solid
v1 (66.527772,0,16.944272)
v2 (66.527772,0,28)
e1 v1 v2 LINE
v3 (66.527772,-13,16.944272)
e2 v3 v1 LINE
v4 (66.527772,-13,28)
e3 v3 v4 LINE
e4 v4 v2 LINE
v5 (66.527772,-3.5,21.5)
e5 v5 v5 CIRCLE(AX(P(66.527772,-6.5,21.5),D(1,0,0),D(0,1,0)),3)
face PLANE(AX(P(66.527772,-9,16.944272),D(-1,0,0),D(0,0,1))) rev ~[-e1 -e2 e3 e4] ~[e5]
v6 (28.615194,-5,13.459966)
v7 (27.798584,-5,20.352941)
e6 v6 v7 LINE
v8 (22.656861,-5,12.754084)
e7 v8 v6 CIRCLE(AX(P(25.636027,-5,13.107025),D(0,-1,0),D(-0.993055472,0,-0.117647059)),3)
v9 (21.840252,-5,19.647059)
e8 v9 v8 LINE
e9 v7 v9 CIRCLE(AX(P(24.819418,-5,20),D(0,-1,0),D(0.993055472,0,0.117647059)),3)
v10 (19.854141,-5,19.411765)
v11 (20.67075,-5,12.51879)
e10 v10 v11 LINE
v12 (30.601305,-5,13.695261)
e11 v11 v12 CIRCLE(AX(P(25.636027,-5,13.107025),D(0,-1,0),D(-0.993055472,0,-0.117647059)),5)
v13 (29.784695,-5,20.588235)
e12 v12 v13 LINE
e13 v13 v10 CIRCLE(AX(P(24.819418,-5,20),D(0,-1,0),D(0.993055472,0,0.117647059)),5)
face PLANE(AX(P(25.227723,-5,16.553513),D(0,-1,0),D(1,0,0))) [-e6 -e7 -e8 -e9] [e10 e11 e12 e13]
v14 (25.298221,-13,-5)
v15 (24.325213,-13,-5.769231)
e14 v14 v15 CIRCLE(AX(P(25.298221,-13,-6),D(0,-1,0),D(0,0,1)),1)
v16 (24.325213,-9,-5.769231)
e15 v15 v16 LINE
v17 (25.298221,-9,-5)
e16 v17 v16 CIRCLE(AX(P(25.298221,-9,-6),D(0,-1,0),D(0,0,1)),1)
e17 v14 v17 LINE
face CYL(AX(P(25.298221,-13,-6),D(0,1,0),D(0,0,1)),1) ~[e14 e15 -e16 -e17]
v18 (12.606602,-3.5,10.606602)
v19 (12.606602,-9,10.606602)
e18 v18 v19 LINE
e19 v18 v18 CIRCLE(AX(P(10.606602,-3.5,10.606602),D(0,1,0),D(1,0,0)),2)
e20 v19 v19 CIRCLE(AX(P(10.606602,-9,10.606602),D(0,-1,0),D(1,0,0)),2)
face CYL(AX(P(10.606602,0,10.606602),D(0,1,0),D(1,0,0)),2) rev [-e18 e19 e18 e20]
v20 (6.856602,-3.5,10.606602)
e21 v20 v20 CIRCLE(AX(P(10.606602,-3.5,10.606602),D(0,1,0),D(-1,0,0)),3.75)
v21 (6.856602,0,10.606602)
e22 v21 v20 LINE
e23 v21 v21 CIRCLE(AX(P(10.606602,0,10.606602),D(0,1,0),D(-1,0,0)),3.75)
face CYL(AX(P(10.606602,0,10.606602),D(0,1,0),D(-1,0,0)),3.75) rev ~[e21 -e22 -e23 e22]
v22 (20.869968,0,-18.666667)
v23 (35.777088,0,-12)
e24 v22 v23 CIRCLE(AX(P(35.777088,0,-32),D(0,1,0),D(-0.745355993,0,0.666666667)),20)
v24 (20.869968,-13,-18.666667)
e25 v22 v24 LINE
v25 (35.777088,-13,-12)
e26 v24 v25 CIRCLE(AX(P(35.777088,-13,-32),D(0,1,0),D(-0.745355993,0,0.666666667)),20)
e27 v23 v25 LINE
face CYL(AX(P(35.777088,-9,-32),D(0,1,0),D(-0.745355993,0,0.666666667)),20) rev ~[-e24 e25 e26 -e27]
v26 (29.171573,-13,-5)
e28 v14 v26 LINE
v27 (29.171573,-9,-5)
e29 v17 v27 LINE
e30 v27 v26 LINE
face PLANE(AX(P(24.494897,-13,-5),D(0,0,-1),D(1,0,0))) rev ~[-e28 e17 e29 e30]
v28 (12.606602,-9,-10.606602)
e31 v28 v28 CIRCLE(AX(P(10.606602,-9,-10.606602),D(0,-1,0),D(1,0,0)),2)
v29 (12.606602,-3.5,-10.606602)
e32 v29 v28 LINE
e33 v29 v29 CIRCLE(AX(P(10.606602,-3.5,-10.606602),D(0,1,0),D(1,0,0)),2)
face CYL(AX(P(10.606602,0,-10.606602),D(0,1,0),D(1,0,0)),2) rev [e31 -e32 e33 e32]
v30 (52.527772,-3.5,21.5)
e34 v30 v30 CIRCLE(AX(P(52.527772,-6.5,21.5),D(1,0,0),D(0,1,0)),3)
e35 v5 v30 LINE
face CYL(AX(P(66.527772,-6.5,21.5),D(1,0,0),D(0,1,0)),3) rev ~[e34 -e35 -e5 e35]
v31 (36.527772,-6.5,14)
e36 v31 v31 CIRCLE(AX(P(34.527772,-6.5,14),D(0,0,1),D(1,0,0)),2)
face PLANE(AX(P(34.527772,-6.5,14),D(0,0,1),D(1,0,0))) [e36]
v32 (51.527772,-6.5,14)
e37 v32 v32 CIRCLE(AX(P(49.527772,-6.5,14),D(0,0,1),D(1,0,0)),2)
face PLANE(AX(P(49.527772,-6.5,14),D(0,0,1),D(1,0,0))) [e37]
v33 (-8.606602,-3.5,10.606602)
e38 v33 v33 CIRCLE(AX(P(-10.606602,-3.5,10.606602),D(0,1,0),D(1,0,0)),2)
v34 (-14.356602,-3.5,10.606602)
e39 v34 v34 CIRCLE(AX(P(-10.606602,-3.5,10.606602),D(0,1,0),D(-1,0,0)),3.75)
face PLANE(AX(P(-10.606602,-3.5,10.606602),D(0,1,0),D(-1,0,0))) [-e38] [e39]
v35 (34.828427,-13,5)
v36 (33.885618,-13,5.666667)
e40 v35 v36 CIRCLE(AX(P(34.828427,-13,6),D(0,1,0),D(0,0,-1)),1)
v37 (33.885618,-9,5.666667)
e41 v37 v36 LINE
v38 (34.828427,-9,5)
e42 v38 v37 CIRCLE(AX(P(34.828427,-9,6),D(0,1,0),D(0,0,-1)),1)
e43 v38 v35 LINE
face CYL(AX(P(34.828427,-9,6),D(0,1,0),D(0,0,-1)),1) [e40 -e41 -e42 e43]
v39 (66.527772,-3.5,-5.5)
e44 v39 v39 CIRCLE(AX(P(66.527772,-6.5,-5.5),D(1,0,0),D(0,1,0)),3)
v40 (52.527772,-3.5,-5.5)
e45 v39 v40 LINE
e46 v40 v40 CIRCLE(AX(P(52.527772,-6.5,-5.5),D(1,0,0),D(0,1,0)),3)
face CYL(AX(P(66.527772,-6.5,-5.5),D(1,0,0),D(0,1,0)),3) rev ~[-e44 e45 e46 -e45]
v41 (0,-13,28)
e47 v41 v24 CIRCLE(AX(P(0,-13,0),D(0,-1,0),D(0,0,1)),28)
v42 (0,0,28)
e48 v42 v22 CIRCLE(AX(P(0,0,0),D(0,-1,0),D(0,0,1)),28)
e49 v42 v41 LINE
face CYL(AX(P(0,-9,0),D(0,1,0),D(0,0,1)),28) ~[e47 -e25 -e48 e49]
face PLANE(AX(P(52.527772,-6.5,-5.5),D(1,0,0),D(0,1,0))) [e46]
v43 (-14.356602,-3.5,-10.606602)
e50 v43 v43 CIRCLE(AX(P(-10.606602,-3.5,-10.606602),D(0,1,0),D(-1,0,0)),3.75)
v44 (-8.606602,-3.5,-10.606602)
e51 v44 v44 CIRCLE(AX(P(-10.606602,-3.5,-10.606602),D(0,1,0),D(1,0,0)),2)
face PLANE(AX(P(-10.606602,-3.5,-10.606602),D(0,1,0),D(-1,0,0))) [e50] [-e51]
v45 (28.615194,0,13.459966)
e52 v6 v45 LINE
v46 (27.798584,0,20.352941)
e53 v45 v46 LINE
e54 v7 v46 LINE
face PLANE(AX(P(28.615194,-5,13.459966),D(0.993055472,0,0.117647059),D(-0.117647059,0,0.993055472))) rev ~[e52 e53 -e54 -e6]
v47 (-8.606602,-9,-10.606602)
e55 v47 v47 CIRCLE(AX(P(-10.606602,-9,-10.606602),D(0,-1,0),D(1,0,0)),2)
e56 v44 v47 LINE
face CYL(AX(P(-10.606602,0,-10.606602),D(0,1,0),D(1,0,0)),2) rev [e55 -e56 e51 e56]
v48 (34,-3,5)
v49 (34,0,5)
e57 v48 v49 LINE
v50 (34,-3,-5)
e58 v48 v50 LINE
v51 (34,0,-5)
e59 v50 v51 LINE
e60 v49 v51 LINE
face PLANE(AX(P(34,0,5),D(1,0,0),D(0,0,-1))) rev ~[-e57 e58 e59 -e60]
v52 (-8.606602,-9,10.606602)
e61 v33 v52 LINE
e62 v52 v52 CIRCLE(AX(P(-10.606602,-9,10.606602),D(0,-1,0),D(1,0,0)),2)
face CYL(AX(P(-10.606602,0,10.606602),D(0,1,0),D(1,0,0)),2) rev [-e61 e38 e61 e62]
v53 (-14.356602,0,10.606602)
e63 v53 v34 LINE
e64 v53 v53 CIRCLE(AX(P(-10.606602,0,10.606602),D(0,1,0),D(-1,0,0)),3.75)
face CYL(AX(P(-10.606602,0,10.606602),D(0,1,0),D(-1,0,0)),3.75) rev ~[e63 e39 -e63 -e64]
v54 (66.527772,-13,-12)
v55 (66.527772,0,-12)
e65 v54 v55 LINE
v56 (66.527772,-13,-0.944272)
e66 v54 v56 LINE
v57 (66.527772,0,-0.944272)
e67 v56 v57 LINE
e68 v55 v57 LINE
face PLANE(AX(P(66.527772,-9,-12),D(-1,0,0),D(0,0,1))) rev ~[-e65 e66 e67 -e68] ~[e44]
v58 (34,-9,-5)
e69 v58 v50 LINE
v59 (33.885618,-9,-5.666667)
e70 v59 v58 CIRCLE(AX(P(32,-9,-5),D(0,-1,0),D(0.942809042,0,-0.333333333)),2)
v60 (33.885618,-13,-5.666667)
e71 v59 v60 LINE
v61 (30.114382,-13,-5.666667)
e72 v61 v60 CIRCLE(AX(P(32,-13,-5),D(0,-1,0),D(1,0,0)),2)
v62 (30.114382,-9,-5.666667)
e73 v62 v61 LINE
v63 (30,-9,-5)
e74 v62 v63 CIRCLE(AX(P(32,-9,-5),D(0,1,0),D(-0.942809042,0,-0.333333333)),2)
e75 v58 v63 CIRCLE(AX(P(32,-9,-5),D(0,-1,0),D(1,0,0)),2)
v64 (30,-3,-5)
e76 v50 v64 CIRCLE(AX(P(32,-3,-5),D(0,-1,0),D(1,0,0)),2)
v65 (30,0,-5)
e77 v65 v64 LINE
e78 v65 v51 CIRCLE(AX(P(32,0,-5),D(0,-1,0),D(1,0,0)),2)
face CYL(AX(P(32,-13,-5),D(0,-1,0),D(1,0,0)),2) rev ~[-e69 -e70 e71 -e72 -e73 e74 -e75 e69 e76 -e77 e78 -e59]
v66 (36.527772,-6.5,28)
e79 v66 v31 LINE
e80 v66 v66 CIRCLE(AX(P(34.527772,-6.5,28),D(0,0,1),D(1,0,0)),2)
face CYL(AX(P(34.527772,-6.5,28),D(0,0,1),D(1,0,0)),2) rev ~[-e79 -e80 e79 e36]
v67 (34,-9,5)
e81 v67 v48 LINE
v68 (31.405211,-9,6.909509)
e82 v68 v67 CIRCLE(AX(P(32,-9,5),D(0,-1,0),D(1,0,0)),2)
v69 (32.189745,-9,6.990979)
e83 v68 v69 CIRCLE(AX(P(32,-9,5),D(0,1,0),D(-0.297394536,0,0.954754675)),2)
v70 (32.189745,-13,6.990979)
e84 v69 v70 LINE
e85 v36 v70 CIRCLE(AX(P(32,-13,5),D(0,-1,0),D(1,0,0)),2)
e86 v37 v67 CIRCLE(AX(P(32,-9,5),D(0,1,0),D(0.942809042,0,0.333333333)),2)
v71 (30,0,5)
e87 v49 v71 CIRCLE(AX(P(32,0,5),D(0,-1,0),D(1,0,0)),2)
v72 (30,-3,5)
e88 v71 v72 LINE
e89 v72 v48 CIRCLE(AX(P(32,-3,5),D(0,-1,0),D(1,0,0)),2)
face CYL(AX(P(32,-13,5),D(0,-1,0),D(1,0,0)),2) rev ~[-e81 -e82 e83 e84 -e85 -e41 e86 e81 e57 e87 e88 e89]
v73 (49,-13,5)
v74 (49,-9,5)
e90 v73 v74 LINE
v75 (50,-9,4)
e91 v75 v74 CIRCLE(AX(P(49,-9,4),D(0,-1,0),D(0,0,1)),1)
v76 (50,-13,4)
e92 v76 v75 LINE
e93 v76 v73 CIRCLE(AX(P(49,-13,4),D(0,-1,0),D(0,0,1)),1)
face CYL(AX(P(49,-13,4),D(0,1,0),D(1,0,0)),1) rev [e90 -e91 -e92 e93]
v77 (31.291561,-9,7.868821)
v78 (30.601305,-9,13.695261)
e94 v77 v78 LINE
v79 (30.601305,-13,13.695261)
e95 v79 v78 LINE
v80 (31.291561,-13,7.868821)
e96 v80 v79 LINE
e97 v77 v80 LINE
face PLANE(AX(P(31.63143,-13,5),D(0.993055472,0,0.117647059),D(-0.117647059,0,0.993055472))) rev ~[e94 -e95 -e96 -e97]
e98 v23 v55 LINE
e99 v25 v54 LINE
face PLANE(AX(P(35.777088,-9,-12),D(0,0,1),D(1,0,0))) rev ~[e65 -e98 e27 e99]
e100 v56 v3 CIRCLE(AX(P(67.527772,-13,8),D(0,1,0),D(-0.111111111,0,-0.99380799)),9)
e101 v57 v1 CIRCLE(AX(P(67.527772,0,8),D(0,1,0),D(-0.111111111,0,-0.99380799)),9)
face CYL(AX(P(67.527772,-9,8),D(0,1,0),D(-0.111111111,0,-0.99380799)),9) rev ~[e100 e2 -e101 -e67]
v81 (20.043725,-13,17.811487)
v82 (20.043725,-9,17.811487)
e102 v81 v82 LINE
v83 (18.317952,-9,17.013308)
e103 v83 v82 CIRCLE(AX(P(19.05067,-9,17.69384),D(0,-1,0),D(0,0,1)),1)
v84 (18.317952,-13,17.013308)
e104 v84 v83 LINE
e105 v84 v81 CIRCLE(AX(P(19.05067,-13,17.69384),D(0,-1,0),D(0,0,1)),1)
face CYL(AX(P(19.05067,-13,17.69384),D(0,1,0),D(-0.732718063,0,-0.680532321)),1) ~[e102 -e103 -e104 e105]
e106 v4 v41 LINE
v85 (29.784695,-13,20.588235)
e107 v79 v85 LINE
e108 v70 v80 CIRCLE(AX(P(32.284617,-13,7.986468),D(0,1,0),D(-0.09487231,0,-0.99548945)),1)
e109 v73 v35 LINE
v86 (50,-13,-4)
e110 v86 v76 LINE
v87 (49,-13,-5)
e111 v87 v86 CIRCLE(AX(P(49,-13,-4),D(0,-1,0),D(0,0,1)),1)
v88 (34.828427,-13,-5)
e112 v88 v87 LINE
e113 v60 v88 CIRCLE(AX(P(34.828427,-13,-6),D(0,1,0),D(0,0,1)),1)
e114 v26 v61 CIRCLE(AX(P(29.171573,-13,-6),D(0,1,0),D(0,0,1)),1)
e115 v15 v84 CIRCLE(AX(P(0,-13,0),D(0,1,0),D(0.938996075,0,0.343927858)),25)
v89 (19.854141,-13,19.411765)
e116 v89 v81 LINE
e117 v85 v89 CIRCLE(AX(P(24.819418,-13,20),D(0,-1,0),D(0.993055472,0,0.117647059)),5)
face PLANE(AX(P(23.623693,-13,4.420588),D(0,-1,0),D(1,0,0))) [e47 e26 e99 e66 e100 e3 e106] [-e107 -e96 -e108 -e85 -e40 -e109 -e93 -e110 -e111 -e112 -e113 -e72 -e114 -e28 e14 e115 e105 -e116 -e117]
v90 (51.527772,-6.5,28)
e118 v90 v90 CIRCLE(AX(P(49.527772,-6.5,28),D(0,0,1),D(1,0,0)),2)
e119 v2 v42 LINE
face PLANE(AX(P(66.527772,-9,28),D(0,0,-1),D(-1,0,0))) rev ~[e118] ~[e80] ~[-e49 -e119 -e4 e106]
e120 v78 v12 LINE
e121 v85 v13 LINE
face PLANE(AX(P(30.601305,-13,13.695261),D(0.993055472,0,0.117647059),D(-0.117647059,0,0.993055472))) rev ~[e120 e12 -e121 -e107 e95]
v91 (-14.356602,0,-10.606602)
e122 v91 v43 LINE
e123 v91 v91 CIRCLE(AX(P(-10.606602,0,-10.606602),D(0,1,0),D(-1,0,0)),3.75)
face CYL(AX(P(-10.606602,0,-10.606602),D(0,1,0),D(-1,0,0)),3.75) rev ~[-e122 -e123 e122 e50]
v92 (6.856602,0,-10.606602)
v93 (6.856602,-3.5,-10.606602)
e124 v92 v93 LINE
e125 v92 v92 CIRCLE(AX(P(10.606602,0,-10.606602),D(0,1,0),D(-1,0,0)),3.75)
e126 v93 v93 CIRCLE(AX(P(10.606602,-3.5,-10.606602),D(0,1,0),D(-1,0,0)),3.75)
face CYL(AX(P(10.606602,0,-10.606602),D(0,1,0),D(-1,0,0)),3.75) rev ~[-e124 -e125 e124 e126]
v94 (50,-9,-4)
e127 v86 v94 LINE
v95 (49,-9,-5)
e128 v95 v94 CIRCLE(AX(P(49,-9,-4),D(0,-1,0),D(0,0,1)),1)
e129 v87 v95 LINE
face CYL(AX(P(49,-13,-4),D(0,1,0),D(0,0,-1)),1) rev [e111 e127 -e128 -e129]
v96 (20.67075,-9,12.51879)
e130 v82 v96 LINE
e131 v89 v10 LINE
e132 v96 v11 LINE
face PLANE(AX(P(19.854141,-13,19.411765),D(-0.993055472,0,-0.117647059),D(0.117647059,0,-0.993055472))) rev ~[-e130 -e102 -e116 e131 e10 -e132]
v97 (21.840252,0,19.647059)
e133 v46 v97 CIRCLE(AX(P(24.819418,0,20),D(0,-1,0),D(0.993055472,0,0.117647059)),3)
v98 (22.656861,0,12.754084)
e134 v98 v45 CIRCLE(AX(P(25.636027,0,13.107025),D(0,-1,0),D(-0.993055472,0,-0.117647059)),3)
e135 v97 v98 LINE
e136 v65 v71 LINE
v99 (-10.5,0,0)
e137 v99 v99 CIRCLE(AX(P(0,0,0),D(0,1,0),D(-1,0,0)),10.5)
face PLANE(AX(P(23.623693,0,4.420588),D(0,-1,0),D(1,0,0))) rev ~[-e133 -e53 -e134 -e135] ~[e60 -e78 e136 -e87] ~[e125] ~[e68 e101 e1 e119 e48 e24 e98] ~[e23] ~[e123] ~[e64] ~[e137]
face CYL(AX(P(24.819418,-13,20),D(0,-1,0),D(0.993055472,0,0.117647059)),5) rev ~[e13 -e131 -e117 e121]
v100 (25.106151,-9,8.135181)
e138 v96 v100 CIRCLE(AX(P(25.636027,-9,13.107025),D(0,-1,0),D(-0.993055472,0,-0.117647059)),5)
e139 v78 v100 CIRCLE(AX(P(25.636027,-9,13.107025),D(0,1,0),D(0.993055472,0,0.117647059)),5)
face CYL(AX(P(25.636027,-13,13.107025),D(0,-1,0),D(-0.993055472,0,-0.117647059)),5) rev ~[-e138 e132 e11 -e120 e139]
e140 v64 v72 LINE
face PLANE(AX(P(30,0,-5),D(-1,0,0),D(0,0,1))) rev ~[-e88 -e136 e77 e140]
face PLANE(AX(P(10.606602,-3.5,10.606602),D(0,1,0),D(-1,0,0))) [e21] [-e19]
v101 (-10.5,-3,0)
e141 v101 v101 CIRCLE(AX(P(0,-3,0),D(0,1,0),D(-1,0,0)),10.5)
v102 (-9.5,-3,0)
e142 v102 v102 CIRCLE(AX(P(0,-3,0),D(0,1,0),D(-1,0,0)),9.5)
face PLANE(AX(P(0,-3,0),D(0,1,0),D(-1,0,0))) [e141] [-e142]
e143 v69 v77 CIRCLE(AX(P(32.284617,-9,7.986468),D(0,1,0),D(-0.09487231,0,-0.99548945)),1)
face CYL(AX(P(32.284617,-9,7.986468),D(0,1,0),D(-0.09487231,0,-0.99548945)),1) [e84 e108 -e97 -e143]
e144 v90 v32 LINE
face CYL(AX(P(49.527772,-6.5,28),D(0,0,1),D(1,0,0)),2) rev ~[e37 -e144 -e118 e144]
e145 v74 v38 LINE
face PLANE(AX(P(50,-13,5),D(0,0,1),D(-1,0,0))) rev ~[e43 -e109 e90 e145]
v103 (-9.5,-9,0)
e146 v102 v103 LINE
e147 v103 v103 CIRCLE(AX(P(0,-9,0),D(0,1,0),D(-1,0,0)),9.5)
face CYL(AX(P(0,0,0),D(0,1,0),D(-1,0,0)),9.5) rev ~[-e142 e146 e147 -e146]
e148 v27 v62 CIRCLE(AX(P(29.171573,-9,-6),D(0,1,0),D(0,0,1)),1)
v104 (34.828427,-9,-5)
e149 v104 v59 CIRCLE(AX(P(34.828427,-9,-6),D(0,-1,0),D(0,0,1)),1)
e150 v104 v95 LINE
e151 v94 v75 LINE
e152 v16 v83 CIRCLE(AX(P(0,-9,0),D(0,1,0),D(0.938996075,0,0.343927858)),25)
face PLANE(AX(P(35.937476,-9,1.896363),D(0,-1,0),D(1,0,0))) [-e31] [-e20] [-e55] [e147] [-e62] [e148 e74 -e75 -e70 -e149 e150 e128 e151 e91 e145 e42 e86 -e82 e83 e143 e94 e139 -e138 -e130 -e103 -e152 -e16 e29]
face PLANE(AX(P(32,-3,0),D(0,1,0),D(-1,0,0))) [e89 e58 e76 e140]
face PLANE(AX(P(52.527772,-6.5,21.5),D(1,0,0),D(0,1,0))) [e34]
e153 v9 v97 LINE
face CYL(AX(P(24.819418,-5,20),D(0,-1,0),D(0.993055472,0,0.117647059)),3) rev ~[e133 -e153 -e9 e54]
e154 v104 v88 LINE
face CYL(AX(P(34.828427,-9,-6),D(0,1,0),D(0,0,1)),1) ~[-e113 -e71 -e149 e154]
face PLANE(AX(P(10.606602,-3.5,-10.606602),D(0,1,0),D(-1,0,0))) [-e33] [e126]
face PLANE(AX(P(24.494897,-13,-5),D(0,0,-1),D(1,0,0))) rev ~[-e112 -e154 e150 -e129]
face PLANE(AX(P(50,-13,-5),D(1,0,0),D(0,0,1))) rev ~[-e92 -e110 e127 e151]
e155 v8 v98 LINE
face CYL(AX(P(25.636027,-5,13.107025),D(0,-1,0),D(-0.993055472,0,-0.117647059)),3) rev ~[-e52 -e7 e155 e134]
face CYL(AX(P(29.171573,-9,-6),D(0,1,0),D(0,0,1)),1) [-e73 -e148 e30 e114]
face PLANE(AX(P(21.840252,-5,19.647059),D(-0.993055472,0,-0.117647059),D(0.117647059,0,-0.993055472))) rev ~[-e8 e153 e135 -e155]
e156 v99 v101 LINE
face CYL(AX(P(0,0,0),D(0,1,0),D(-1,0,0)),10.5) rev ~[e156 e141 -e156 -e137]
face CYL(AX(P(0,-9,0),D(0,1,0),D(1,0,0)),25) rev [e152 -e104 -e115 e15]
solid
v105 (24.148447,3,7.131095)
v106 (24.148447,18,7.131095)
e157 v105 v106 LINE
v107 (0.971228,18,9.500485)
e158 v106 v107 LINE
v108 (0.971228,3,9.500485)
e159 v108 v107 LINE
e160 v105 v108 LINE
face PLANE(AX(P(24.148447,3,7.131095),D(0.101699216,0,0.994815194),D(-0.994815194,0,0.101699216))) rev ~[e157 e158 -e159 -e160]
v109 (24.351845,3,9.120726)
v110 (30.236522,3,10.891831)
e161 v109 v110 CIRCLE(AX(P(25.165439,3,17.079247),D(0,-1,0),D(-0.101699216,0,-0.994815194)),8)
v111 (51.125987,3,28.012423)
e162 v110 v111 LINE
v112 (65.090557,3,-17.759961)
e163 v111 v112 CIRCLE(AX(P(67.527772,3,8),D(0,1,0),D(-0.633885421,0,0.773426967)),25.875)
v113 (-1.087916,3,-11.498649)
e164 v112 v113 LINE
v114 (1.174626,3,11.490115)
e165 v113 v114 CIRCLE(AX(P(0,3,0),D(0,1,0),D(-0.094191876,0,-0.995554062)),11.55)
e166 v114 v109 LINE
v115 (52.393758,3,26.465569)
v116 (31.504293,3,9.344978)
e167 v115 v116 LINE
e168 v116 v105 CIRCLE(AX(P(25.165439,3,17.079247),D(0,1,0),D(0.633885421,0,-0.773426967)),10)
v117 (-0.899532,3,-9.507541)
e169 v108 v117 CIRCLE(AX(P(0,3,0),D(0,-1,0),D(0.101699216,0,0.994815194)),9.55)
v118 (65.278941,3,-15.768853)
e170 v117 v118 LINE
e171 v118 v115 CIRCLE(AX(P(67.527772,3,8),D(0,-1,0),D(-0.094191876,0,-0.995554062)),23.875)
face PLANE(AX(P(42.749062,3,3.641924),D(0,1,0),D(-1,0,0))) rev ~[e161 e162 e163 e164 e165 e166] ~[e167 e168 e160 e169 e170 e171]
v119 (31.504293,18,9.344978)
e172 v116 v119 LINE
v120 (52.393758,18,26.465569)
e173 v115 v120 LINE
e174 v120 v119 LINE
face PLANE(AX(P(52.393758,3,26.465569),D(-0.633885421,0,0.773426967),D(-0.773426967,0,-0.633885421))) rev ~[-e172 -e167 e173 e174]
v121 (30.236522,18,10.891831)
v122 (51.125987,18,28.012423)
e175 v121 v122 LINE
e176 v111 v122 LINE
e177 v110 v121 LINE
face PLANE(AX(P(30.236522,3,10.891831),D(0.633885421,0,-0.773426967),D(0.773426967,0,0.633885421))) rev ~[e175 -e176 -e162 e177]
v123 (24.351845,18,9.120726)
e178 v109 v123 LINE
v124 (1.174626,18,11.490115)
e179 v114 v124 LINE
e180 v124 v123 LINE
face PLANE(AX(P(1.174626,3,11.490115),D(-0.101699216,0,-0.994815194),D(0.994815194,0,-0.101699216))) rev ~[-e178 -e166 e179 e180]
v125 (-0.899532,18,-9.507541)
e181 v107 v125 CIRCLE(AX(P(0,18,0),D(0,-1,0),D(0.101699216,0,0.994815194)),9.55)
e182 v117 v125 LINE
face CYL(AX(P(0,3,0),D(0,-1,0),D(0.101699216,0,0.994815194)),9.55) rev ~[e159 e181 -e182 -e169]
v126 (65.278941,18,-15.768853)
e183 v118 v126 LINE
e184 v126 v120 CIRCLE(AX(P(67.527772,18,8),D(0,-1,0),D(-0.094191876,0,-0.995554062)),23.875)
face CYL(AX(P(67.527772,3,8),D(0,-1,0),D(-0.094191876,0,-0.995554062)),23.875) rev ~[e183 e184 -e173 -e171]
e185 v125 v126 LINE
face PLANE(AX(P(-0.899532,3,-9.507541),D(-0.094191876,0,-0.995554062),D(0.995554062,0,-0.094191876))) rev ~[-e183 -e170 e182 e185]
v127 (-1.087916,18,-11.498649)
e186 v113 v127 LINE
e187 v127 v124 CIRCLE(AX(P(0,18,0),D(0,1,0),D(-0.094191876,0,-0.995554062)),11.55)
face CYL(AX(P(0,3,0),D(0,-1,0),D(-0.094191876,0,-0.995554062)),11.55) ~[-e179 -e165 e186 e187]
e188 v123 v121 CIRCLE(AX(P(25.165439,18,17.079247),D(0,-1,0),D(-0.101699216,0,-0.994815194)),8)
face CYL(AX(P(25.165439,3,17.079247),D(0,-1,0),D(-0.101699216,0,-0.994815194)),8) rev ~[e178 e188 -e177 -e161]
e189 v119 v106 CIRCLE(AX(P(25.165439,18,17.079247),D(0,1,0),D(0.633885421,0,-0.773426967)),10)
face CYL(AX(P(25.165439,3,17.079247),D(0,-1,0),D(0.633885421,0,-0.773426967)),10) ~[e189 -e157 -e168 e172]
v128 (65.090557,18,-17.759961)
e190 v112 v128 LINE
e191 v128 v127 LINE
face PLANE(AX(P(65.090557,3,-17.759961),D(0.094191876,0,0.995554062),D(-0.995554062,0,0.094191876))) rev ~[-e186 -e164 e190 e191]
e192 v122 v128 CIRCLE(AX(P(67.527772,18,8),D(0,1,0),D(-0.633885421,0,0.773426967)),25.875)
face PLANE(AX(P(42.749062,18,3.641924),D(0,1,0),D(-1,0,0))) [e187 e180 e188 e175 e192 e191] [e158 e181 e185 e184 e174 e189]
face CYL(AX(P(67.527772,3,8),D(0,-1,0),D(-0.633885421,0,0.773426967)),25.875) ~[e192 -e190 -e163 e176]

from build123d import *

# Parameters (mm, degrees)
F0_R         = 2
F0_R_2       = 9
F1_DEPTH     = 9
F2_R         = 9.5
F3_DEPTH     = 9
F4_R         = 25
F5_DEPTH     = 4
F8_DEPTH     = 8
F10_DEPTH    = 5.001
F11_R        = 1
F13_DEPTH    = 4
F14_R        = 1
F16_R        = 2
F17_DEPTH    = 13.001
F18_T1_DEPTH = 6.0710678119
F18_T3_DEPTH = 6.4150512427
F20_DEPTH    = 3
F21_R        = 3
F22_DEPTH    = 14
F25_DEPTH    = 15
F26_R        = 2
F27_DEPTH    = 14
F28_R        = 3.75
F29_DEPTH    = 3.5
F30_R        = 10.5
F31_DEPTH    = 3


# Not quite as in the source:
# - a fillet or chamfer that OpenCascade refuses, or shapes differently, is made with other operations: its cross-section is extruded or revolved along the edge and cut away or added


with BuildPart() as f1:
    # F0 (on Front) → F1 (new body)
    with BuildSketch(Plane.XZ):
        with BuildLine():
            ThreePointArc((66.5277720645, -0.94427191), (58.5277720645, 8), (66.5277720645, 16.94427191))
            Line((66.5277720645, 16.94427191), (66.5277720645, 28))
            Line((66.5277720645, 28), (0, 28))
            ThreePointArc((0, 28), (-25.5603860169, -11.430952133), (20.86996779, -18.6666666667))
            ThreePointArc((20.86996779, -18.6666666667), (27.6121218307, -13.7425814165), (35.77708764, -12))
            Line((35.77708764, -12), (66.5277720645, -12))
            Line((66.5277720645, -12), (66.5277720645, -0.94427191))
        make_face()
        with Locations((-10.6066017178, -10.6066017178)):
            Circle(F0_R, mode=Mode.SUBTRACT)
        with Locations((10.6066017178, -10.6066017178)):
            Circle(F0_R, mode=Mode.SUBTRACT)
        with Locations((-10.6066017178, 10.6066017178)):
            Circle(F0_R, mode=Mode.SUBTRACT)
        Circle(F0_R_2, mode=Mode.SUBTRACT)
        with Locations((10.6066017178, 10.6066017178)):
            Circle(F0_R, mode=Mode.SUBTRACT)
    extrude(amount=F1_DEPTH)

    # F2 (on face) → F3 (cut)
    with BuildSketch(Plane(origin=(0, 0, 0), x_dir=(-1, 0, 0), z_dir=(0, 1, 0))):
        Circle(F2_R)
    extrude(amount=-F3_DEPTH, mode=Mode.SUBTRACT)

    # F4 (on face) → F5 (join)
    with BuildSketch(Plane.XZ.offset(9)):
        with BuildLine():
            Line((66.5277720645, 28), (0, 28))
            ThreePointArc((0, 28), (-25.5603860169, -11.430952133), (20.86996779, -18.6666666667))
            ThreePointArc((20.86996779, -18.6666666667), (27.6121218307, -13.7425814165), (35.77708764, -12))
            Line((35.77708764, -12), (66.5277720645, -12))
            Line((66.5277720645, -12), (66.5277720645, -0.94427191))
            ThreePointArc((66.5277720645, -0.94427191), (58.5277720645, 8), (66.5277720645, 16.94427191))
            Line((66.5277720645, 16.94427191), (66.5277720645, 28))
        make_face()
        Circle(F4_R, mode=Mode.SUBTRACT)
    extrude(amount=F5_DEPTH)

    # F7 (on face) → F8 (cut)
    with BuildSketch(Plane.XZ.offset(13)):
        with BuildLine():
            ThreePointArc((20.6707497856, 12.5187900095), (26.2242624374, 8.1417479459), (30.601304501, 13.6952605977))
            Line((30.601304501, 13.6952605977), (29.7846953358, 20.5882352941))
            ThreePointArc((29.7846953358, 20.5882352941), (24.231182684, 24.9652773577), (19.8541406204, 19.4117647059))
            Line((19.8541406204, 19.4117647059), (20.6707497856, 12.5187900095))
        make_face()
    extrude(amount=-F8_DEPTH, mode=Mode.SUBTRACT)

    # F9 (on face) → F10 (cut, through all)
    with BuildSketch(Plane.XZ.offset(5)):
        with BuildLine():
            ThreePointArc((27.7985843927, 20.3529411765), (24.4664768016, 22.9791664146), (21.8402515635, 19.6470588235))
            Line((21.8402515635, 19.6470588235), (22.6568607287, 12.7540841271))
            ThreePointArc((22.6568607287, 12.7540841271), (25.9889683197, 10.127858889), (28.6151935579, 13.4599664801))
            Line((28.6151935579, 13.4599664801), (27.7985843927, 20.3529411765))
        make_face()
    extrude(amount=-F10_DEPTH, mode=Mode.SUBTRACT)

    # F11
    f11_edges = [f1.edges().sort_by_distance(p)[0] for p in [
        (20.450239, -11, 14.380116),
        (23.474902, -11, 8.598196),
    ]]
    fillet(f11_edges, radius=F11_R)

    # F12 (on face) → F13 (cut, through all)
    with BuildSketch(Plane.XZ.offset(13)):
        with BuildLine():
            ThreePointArc((24.038630661, 6.8661660296), (24.9815394091, 0.9605668915), (24.4948974278, -5))
            Line((24.4948974278, -5), (50, -5))
            Line((50, -5), (50, 0))
            Line((50, 0), (50, 5))
            Line((50, 5), (31.6314300723, 5))
            Line((31.6314300723, 5), (30.601304501, 13.6952605977))
            ThreePointArc((30.601304501, 13.6952605977), (29.192263391, 9.5923156783), (25.1061510967, 8.1351814429))
            ThreePointArc((25.1061510967, 8.1351814429), (24.2349308003, 7.7845517146), (24.038630661, 6.8661660296))
        make_face()
    extrude(amount=-F13_DEPTH, mode=Mode.SUBTRACT)

    # F14
    f14_edges = [f1.edges().sort_by_distance(p)[0] for p in [
        (24.494897, -11, -5),
        (50, -11, 5),
        (50, -11, -5),
    ]]
    fillet(f14_edges, radius=F14_R)

    # F16 (on face) → F17 (cut, through all)
    with BuildSketch(Plane.XZ.offset(13)):
        with Locations((32, 5)):
            Circle(F16_R)
        with Locations((32, -5)):
            Circle(F16_R)
    extrude(amount=-F17_DEPTH, mode=Mode.SUBTRACT)

    # F18: fillet of radius 1 on 4 edges, made by hand

    # F18_s2 → F18_t1 (cut)
    with BuildSketch(Plane.XZ.offset(9)):
        with BuildLine():
            ThreePointArc((34.8284271248, -5), (34.2510768556, -5.1835034191), (33.8856180832, -5.6666666667))
            ThreePointArc((33.8856180832, -5.6666666667), (33.9711971193, -5.3382039575), (34, -5))
            Line((34, -5), (34.8284271248, -5))
        make_face()
        with BuildLine():
            ThreePointArc((29.1715728752, -5), (29.7489231444, -5.1835034191), (30.1143819168, -5.6666666667))
            ThreePointArc((30.1143819168, -5.6666666667), (30.0288028807, -5.3382039575), (30, -5))
            Line((30, -5), (29.1715728752, -5))
        make_face()
        with BuildLine():
            ThreePointArc((34.8284271248, 5), (34.2510768556, 5.1835034191), (33.8856180832, 5.6666666667))
            ThreePointArc((33.8856180832, 5.6666666667), (33.9711971193, 5.3382039575), (34, 5))
            Line((34, 5), (34.8284271248, 5))
        make_face()
    extrude(amount=F18_T1_DEPTH, mode=Mode.SUBTRACT)

    # F18_s4 → F18_t3 (cut)
    with BuildSketch(Plane.XZ.offset(9)):
        with BuildLine():
            ThreePointArc((32.1897446196, 6.9909788998), (31.5856544625, 7.2713099967), (31.2915614579, 7.8688212908))
            Line((31.2915614579, 7.8688212908), (31.4052109282, 6.9095093506))
            ThreePointArc((31.4052109282, 6.9095093506), (31.7934217487, 6.9893027487), (32.1897446196, 6.9909788998))
        make_face()
    extrude(amount=F18_T3_DEPTH, mode=Mode.SUBTRACT)

    # F19 (on face) → F20 (cut)
    with BuildSketch(Plane(origin=(0, 0, 0), x_dir=(-1, 0, 0), z_dir=(0, 1, 0))):
        with BuildLine():
            ThreePointArc((-30, 5), (-32, 7), (-34, 5))
            Line((-34, 5), (-34, -5))
            ThreePointArc((-34, -5), (-32, -7), (-30, -5))
            Line((-30, -5), (-30, 5))
        make_face()
    extrude(amount=-F20_DEPTH, mode=Mode.SUBTRACT)

    # F21 (on face) → F22 (cut)
    with BuildSketch(Plane.YZ.offset(66.5277720645)):
        with Locations((-6.5, 21.5)):
            Circle(F21_R)
        with Locations((-6.5, -5.5)):
            Circle(F21_R)
    extrude(amount=-F22_DEPTH, mode=Mode.SUBTRACT)

    # F26 (on face) → F27 (cut)
    with BuildSketch(Plane.XY.offset(28)):
        with Locations((49.5277720645, -6.5)):
            Circle(F26_R)
        with Locations((34.5277720645, -6.5)):
            Circle(F26_R)
    extrude(amount=-F27_DEPTH, mode=Mode.SUBTRACT)

    # F28 (on face) → F29 (cut)
    with BuildSketch(Plane(origin=(0, 0, 0), x_dir=(-1, 0, 0), z_dir=(0, 1, 0))):
        with Locations((-10.6066017178, -10.6066017178)):
            Circle(F28_R)
        with Locations((10.6066017178, -10.6066017178)):
            Circle(F28_R)
        with Locations((10.6066017178, 10.6066017178)):
            Circle(F28_R)
        with Locations((-10.6066017178, 10.6066017178)):
            Circle(F28_R)
    extrude(amount=-F29_DEPTH, mode=Mode.SUBTRACT)

    # F30 (on face) → F31 (cut)
    with BuildSketch(Plane(origin=(0, 0, 0), x_dir=(-1, 0, 0), z_dir=(0, 1, 0))):
        Circle(F30_R)
    extrude(amount=-F31_DEPTH, mode=Mode.SUBTRACT)


with BuildPart() as f25:
    # F24 (on offset) → F25 (new body)
    with BuildSketch(Plane(origin=(0, 3, 0), x_dir=(-1, 0, 0), z_dir=(0, 1, 0))):
        with BuildLine():
            Line((-30.2365222754, 10.8918314545), (-51.1259867982, 28.0124227688))
            ThreePointArc((-51.1259867982, 28.0124227688), (-92.2766057305, 15.5505534348), (-65.0905572844, -17.759961357))
            Line((-65.0905572844, -17.759961357), (1.0879161627, -11.4986494173))
            ThreePointArc((1.0879161627, -11.4986494173), (11.4944642154, 1.1312790991), (-1.1746259412, 11.4901154867))
            Line((-1.1746259412, 11.4901154867), (-24.3518451825, 9.1207256405))
            ThreePointArc((-24.3518451825, 9.1207256405), (-27.471031774, 9.4186831416), (-30.2365222754, 10.8918314545))
        make_face()
        with BuildLine():
            ThreePointArc((-65.2789410355, -15.7688532328), (-90.3636524037, 14.966935778), (-52.39375764, 26.4655688349))
            Line((-52.39375764, 26.4655688349), (-31.5042931172, 9.3449775207))
            ThreePointArc((-31.5042931172, 9.3449775207), (-28.0474299905, 7.5035421295), (-24.1484467511, 7.1310952532))
            Line((-24.1484467511, 7.1310952532), (-0.9712275098, 9.5004850994))
            ThreePointArc((-0.9712275098, 9.5004850994), (9.5040808015, 0.9353866144), (0.8995324116, -9.5075412931))
            Line((0.8995324116, -9.5075412931), (-65.2789410355, -15.7688532328))
        make_face(mode=Mode.SUBTRACT)
    extrude(amount=F25_DEPTH)


solid = Compound([f1.part, f25.part])
